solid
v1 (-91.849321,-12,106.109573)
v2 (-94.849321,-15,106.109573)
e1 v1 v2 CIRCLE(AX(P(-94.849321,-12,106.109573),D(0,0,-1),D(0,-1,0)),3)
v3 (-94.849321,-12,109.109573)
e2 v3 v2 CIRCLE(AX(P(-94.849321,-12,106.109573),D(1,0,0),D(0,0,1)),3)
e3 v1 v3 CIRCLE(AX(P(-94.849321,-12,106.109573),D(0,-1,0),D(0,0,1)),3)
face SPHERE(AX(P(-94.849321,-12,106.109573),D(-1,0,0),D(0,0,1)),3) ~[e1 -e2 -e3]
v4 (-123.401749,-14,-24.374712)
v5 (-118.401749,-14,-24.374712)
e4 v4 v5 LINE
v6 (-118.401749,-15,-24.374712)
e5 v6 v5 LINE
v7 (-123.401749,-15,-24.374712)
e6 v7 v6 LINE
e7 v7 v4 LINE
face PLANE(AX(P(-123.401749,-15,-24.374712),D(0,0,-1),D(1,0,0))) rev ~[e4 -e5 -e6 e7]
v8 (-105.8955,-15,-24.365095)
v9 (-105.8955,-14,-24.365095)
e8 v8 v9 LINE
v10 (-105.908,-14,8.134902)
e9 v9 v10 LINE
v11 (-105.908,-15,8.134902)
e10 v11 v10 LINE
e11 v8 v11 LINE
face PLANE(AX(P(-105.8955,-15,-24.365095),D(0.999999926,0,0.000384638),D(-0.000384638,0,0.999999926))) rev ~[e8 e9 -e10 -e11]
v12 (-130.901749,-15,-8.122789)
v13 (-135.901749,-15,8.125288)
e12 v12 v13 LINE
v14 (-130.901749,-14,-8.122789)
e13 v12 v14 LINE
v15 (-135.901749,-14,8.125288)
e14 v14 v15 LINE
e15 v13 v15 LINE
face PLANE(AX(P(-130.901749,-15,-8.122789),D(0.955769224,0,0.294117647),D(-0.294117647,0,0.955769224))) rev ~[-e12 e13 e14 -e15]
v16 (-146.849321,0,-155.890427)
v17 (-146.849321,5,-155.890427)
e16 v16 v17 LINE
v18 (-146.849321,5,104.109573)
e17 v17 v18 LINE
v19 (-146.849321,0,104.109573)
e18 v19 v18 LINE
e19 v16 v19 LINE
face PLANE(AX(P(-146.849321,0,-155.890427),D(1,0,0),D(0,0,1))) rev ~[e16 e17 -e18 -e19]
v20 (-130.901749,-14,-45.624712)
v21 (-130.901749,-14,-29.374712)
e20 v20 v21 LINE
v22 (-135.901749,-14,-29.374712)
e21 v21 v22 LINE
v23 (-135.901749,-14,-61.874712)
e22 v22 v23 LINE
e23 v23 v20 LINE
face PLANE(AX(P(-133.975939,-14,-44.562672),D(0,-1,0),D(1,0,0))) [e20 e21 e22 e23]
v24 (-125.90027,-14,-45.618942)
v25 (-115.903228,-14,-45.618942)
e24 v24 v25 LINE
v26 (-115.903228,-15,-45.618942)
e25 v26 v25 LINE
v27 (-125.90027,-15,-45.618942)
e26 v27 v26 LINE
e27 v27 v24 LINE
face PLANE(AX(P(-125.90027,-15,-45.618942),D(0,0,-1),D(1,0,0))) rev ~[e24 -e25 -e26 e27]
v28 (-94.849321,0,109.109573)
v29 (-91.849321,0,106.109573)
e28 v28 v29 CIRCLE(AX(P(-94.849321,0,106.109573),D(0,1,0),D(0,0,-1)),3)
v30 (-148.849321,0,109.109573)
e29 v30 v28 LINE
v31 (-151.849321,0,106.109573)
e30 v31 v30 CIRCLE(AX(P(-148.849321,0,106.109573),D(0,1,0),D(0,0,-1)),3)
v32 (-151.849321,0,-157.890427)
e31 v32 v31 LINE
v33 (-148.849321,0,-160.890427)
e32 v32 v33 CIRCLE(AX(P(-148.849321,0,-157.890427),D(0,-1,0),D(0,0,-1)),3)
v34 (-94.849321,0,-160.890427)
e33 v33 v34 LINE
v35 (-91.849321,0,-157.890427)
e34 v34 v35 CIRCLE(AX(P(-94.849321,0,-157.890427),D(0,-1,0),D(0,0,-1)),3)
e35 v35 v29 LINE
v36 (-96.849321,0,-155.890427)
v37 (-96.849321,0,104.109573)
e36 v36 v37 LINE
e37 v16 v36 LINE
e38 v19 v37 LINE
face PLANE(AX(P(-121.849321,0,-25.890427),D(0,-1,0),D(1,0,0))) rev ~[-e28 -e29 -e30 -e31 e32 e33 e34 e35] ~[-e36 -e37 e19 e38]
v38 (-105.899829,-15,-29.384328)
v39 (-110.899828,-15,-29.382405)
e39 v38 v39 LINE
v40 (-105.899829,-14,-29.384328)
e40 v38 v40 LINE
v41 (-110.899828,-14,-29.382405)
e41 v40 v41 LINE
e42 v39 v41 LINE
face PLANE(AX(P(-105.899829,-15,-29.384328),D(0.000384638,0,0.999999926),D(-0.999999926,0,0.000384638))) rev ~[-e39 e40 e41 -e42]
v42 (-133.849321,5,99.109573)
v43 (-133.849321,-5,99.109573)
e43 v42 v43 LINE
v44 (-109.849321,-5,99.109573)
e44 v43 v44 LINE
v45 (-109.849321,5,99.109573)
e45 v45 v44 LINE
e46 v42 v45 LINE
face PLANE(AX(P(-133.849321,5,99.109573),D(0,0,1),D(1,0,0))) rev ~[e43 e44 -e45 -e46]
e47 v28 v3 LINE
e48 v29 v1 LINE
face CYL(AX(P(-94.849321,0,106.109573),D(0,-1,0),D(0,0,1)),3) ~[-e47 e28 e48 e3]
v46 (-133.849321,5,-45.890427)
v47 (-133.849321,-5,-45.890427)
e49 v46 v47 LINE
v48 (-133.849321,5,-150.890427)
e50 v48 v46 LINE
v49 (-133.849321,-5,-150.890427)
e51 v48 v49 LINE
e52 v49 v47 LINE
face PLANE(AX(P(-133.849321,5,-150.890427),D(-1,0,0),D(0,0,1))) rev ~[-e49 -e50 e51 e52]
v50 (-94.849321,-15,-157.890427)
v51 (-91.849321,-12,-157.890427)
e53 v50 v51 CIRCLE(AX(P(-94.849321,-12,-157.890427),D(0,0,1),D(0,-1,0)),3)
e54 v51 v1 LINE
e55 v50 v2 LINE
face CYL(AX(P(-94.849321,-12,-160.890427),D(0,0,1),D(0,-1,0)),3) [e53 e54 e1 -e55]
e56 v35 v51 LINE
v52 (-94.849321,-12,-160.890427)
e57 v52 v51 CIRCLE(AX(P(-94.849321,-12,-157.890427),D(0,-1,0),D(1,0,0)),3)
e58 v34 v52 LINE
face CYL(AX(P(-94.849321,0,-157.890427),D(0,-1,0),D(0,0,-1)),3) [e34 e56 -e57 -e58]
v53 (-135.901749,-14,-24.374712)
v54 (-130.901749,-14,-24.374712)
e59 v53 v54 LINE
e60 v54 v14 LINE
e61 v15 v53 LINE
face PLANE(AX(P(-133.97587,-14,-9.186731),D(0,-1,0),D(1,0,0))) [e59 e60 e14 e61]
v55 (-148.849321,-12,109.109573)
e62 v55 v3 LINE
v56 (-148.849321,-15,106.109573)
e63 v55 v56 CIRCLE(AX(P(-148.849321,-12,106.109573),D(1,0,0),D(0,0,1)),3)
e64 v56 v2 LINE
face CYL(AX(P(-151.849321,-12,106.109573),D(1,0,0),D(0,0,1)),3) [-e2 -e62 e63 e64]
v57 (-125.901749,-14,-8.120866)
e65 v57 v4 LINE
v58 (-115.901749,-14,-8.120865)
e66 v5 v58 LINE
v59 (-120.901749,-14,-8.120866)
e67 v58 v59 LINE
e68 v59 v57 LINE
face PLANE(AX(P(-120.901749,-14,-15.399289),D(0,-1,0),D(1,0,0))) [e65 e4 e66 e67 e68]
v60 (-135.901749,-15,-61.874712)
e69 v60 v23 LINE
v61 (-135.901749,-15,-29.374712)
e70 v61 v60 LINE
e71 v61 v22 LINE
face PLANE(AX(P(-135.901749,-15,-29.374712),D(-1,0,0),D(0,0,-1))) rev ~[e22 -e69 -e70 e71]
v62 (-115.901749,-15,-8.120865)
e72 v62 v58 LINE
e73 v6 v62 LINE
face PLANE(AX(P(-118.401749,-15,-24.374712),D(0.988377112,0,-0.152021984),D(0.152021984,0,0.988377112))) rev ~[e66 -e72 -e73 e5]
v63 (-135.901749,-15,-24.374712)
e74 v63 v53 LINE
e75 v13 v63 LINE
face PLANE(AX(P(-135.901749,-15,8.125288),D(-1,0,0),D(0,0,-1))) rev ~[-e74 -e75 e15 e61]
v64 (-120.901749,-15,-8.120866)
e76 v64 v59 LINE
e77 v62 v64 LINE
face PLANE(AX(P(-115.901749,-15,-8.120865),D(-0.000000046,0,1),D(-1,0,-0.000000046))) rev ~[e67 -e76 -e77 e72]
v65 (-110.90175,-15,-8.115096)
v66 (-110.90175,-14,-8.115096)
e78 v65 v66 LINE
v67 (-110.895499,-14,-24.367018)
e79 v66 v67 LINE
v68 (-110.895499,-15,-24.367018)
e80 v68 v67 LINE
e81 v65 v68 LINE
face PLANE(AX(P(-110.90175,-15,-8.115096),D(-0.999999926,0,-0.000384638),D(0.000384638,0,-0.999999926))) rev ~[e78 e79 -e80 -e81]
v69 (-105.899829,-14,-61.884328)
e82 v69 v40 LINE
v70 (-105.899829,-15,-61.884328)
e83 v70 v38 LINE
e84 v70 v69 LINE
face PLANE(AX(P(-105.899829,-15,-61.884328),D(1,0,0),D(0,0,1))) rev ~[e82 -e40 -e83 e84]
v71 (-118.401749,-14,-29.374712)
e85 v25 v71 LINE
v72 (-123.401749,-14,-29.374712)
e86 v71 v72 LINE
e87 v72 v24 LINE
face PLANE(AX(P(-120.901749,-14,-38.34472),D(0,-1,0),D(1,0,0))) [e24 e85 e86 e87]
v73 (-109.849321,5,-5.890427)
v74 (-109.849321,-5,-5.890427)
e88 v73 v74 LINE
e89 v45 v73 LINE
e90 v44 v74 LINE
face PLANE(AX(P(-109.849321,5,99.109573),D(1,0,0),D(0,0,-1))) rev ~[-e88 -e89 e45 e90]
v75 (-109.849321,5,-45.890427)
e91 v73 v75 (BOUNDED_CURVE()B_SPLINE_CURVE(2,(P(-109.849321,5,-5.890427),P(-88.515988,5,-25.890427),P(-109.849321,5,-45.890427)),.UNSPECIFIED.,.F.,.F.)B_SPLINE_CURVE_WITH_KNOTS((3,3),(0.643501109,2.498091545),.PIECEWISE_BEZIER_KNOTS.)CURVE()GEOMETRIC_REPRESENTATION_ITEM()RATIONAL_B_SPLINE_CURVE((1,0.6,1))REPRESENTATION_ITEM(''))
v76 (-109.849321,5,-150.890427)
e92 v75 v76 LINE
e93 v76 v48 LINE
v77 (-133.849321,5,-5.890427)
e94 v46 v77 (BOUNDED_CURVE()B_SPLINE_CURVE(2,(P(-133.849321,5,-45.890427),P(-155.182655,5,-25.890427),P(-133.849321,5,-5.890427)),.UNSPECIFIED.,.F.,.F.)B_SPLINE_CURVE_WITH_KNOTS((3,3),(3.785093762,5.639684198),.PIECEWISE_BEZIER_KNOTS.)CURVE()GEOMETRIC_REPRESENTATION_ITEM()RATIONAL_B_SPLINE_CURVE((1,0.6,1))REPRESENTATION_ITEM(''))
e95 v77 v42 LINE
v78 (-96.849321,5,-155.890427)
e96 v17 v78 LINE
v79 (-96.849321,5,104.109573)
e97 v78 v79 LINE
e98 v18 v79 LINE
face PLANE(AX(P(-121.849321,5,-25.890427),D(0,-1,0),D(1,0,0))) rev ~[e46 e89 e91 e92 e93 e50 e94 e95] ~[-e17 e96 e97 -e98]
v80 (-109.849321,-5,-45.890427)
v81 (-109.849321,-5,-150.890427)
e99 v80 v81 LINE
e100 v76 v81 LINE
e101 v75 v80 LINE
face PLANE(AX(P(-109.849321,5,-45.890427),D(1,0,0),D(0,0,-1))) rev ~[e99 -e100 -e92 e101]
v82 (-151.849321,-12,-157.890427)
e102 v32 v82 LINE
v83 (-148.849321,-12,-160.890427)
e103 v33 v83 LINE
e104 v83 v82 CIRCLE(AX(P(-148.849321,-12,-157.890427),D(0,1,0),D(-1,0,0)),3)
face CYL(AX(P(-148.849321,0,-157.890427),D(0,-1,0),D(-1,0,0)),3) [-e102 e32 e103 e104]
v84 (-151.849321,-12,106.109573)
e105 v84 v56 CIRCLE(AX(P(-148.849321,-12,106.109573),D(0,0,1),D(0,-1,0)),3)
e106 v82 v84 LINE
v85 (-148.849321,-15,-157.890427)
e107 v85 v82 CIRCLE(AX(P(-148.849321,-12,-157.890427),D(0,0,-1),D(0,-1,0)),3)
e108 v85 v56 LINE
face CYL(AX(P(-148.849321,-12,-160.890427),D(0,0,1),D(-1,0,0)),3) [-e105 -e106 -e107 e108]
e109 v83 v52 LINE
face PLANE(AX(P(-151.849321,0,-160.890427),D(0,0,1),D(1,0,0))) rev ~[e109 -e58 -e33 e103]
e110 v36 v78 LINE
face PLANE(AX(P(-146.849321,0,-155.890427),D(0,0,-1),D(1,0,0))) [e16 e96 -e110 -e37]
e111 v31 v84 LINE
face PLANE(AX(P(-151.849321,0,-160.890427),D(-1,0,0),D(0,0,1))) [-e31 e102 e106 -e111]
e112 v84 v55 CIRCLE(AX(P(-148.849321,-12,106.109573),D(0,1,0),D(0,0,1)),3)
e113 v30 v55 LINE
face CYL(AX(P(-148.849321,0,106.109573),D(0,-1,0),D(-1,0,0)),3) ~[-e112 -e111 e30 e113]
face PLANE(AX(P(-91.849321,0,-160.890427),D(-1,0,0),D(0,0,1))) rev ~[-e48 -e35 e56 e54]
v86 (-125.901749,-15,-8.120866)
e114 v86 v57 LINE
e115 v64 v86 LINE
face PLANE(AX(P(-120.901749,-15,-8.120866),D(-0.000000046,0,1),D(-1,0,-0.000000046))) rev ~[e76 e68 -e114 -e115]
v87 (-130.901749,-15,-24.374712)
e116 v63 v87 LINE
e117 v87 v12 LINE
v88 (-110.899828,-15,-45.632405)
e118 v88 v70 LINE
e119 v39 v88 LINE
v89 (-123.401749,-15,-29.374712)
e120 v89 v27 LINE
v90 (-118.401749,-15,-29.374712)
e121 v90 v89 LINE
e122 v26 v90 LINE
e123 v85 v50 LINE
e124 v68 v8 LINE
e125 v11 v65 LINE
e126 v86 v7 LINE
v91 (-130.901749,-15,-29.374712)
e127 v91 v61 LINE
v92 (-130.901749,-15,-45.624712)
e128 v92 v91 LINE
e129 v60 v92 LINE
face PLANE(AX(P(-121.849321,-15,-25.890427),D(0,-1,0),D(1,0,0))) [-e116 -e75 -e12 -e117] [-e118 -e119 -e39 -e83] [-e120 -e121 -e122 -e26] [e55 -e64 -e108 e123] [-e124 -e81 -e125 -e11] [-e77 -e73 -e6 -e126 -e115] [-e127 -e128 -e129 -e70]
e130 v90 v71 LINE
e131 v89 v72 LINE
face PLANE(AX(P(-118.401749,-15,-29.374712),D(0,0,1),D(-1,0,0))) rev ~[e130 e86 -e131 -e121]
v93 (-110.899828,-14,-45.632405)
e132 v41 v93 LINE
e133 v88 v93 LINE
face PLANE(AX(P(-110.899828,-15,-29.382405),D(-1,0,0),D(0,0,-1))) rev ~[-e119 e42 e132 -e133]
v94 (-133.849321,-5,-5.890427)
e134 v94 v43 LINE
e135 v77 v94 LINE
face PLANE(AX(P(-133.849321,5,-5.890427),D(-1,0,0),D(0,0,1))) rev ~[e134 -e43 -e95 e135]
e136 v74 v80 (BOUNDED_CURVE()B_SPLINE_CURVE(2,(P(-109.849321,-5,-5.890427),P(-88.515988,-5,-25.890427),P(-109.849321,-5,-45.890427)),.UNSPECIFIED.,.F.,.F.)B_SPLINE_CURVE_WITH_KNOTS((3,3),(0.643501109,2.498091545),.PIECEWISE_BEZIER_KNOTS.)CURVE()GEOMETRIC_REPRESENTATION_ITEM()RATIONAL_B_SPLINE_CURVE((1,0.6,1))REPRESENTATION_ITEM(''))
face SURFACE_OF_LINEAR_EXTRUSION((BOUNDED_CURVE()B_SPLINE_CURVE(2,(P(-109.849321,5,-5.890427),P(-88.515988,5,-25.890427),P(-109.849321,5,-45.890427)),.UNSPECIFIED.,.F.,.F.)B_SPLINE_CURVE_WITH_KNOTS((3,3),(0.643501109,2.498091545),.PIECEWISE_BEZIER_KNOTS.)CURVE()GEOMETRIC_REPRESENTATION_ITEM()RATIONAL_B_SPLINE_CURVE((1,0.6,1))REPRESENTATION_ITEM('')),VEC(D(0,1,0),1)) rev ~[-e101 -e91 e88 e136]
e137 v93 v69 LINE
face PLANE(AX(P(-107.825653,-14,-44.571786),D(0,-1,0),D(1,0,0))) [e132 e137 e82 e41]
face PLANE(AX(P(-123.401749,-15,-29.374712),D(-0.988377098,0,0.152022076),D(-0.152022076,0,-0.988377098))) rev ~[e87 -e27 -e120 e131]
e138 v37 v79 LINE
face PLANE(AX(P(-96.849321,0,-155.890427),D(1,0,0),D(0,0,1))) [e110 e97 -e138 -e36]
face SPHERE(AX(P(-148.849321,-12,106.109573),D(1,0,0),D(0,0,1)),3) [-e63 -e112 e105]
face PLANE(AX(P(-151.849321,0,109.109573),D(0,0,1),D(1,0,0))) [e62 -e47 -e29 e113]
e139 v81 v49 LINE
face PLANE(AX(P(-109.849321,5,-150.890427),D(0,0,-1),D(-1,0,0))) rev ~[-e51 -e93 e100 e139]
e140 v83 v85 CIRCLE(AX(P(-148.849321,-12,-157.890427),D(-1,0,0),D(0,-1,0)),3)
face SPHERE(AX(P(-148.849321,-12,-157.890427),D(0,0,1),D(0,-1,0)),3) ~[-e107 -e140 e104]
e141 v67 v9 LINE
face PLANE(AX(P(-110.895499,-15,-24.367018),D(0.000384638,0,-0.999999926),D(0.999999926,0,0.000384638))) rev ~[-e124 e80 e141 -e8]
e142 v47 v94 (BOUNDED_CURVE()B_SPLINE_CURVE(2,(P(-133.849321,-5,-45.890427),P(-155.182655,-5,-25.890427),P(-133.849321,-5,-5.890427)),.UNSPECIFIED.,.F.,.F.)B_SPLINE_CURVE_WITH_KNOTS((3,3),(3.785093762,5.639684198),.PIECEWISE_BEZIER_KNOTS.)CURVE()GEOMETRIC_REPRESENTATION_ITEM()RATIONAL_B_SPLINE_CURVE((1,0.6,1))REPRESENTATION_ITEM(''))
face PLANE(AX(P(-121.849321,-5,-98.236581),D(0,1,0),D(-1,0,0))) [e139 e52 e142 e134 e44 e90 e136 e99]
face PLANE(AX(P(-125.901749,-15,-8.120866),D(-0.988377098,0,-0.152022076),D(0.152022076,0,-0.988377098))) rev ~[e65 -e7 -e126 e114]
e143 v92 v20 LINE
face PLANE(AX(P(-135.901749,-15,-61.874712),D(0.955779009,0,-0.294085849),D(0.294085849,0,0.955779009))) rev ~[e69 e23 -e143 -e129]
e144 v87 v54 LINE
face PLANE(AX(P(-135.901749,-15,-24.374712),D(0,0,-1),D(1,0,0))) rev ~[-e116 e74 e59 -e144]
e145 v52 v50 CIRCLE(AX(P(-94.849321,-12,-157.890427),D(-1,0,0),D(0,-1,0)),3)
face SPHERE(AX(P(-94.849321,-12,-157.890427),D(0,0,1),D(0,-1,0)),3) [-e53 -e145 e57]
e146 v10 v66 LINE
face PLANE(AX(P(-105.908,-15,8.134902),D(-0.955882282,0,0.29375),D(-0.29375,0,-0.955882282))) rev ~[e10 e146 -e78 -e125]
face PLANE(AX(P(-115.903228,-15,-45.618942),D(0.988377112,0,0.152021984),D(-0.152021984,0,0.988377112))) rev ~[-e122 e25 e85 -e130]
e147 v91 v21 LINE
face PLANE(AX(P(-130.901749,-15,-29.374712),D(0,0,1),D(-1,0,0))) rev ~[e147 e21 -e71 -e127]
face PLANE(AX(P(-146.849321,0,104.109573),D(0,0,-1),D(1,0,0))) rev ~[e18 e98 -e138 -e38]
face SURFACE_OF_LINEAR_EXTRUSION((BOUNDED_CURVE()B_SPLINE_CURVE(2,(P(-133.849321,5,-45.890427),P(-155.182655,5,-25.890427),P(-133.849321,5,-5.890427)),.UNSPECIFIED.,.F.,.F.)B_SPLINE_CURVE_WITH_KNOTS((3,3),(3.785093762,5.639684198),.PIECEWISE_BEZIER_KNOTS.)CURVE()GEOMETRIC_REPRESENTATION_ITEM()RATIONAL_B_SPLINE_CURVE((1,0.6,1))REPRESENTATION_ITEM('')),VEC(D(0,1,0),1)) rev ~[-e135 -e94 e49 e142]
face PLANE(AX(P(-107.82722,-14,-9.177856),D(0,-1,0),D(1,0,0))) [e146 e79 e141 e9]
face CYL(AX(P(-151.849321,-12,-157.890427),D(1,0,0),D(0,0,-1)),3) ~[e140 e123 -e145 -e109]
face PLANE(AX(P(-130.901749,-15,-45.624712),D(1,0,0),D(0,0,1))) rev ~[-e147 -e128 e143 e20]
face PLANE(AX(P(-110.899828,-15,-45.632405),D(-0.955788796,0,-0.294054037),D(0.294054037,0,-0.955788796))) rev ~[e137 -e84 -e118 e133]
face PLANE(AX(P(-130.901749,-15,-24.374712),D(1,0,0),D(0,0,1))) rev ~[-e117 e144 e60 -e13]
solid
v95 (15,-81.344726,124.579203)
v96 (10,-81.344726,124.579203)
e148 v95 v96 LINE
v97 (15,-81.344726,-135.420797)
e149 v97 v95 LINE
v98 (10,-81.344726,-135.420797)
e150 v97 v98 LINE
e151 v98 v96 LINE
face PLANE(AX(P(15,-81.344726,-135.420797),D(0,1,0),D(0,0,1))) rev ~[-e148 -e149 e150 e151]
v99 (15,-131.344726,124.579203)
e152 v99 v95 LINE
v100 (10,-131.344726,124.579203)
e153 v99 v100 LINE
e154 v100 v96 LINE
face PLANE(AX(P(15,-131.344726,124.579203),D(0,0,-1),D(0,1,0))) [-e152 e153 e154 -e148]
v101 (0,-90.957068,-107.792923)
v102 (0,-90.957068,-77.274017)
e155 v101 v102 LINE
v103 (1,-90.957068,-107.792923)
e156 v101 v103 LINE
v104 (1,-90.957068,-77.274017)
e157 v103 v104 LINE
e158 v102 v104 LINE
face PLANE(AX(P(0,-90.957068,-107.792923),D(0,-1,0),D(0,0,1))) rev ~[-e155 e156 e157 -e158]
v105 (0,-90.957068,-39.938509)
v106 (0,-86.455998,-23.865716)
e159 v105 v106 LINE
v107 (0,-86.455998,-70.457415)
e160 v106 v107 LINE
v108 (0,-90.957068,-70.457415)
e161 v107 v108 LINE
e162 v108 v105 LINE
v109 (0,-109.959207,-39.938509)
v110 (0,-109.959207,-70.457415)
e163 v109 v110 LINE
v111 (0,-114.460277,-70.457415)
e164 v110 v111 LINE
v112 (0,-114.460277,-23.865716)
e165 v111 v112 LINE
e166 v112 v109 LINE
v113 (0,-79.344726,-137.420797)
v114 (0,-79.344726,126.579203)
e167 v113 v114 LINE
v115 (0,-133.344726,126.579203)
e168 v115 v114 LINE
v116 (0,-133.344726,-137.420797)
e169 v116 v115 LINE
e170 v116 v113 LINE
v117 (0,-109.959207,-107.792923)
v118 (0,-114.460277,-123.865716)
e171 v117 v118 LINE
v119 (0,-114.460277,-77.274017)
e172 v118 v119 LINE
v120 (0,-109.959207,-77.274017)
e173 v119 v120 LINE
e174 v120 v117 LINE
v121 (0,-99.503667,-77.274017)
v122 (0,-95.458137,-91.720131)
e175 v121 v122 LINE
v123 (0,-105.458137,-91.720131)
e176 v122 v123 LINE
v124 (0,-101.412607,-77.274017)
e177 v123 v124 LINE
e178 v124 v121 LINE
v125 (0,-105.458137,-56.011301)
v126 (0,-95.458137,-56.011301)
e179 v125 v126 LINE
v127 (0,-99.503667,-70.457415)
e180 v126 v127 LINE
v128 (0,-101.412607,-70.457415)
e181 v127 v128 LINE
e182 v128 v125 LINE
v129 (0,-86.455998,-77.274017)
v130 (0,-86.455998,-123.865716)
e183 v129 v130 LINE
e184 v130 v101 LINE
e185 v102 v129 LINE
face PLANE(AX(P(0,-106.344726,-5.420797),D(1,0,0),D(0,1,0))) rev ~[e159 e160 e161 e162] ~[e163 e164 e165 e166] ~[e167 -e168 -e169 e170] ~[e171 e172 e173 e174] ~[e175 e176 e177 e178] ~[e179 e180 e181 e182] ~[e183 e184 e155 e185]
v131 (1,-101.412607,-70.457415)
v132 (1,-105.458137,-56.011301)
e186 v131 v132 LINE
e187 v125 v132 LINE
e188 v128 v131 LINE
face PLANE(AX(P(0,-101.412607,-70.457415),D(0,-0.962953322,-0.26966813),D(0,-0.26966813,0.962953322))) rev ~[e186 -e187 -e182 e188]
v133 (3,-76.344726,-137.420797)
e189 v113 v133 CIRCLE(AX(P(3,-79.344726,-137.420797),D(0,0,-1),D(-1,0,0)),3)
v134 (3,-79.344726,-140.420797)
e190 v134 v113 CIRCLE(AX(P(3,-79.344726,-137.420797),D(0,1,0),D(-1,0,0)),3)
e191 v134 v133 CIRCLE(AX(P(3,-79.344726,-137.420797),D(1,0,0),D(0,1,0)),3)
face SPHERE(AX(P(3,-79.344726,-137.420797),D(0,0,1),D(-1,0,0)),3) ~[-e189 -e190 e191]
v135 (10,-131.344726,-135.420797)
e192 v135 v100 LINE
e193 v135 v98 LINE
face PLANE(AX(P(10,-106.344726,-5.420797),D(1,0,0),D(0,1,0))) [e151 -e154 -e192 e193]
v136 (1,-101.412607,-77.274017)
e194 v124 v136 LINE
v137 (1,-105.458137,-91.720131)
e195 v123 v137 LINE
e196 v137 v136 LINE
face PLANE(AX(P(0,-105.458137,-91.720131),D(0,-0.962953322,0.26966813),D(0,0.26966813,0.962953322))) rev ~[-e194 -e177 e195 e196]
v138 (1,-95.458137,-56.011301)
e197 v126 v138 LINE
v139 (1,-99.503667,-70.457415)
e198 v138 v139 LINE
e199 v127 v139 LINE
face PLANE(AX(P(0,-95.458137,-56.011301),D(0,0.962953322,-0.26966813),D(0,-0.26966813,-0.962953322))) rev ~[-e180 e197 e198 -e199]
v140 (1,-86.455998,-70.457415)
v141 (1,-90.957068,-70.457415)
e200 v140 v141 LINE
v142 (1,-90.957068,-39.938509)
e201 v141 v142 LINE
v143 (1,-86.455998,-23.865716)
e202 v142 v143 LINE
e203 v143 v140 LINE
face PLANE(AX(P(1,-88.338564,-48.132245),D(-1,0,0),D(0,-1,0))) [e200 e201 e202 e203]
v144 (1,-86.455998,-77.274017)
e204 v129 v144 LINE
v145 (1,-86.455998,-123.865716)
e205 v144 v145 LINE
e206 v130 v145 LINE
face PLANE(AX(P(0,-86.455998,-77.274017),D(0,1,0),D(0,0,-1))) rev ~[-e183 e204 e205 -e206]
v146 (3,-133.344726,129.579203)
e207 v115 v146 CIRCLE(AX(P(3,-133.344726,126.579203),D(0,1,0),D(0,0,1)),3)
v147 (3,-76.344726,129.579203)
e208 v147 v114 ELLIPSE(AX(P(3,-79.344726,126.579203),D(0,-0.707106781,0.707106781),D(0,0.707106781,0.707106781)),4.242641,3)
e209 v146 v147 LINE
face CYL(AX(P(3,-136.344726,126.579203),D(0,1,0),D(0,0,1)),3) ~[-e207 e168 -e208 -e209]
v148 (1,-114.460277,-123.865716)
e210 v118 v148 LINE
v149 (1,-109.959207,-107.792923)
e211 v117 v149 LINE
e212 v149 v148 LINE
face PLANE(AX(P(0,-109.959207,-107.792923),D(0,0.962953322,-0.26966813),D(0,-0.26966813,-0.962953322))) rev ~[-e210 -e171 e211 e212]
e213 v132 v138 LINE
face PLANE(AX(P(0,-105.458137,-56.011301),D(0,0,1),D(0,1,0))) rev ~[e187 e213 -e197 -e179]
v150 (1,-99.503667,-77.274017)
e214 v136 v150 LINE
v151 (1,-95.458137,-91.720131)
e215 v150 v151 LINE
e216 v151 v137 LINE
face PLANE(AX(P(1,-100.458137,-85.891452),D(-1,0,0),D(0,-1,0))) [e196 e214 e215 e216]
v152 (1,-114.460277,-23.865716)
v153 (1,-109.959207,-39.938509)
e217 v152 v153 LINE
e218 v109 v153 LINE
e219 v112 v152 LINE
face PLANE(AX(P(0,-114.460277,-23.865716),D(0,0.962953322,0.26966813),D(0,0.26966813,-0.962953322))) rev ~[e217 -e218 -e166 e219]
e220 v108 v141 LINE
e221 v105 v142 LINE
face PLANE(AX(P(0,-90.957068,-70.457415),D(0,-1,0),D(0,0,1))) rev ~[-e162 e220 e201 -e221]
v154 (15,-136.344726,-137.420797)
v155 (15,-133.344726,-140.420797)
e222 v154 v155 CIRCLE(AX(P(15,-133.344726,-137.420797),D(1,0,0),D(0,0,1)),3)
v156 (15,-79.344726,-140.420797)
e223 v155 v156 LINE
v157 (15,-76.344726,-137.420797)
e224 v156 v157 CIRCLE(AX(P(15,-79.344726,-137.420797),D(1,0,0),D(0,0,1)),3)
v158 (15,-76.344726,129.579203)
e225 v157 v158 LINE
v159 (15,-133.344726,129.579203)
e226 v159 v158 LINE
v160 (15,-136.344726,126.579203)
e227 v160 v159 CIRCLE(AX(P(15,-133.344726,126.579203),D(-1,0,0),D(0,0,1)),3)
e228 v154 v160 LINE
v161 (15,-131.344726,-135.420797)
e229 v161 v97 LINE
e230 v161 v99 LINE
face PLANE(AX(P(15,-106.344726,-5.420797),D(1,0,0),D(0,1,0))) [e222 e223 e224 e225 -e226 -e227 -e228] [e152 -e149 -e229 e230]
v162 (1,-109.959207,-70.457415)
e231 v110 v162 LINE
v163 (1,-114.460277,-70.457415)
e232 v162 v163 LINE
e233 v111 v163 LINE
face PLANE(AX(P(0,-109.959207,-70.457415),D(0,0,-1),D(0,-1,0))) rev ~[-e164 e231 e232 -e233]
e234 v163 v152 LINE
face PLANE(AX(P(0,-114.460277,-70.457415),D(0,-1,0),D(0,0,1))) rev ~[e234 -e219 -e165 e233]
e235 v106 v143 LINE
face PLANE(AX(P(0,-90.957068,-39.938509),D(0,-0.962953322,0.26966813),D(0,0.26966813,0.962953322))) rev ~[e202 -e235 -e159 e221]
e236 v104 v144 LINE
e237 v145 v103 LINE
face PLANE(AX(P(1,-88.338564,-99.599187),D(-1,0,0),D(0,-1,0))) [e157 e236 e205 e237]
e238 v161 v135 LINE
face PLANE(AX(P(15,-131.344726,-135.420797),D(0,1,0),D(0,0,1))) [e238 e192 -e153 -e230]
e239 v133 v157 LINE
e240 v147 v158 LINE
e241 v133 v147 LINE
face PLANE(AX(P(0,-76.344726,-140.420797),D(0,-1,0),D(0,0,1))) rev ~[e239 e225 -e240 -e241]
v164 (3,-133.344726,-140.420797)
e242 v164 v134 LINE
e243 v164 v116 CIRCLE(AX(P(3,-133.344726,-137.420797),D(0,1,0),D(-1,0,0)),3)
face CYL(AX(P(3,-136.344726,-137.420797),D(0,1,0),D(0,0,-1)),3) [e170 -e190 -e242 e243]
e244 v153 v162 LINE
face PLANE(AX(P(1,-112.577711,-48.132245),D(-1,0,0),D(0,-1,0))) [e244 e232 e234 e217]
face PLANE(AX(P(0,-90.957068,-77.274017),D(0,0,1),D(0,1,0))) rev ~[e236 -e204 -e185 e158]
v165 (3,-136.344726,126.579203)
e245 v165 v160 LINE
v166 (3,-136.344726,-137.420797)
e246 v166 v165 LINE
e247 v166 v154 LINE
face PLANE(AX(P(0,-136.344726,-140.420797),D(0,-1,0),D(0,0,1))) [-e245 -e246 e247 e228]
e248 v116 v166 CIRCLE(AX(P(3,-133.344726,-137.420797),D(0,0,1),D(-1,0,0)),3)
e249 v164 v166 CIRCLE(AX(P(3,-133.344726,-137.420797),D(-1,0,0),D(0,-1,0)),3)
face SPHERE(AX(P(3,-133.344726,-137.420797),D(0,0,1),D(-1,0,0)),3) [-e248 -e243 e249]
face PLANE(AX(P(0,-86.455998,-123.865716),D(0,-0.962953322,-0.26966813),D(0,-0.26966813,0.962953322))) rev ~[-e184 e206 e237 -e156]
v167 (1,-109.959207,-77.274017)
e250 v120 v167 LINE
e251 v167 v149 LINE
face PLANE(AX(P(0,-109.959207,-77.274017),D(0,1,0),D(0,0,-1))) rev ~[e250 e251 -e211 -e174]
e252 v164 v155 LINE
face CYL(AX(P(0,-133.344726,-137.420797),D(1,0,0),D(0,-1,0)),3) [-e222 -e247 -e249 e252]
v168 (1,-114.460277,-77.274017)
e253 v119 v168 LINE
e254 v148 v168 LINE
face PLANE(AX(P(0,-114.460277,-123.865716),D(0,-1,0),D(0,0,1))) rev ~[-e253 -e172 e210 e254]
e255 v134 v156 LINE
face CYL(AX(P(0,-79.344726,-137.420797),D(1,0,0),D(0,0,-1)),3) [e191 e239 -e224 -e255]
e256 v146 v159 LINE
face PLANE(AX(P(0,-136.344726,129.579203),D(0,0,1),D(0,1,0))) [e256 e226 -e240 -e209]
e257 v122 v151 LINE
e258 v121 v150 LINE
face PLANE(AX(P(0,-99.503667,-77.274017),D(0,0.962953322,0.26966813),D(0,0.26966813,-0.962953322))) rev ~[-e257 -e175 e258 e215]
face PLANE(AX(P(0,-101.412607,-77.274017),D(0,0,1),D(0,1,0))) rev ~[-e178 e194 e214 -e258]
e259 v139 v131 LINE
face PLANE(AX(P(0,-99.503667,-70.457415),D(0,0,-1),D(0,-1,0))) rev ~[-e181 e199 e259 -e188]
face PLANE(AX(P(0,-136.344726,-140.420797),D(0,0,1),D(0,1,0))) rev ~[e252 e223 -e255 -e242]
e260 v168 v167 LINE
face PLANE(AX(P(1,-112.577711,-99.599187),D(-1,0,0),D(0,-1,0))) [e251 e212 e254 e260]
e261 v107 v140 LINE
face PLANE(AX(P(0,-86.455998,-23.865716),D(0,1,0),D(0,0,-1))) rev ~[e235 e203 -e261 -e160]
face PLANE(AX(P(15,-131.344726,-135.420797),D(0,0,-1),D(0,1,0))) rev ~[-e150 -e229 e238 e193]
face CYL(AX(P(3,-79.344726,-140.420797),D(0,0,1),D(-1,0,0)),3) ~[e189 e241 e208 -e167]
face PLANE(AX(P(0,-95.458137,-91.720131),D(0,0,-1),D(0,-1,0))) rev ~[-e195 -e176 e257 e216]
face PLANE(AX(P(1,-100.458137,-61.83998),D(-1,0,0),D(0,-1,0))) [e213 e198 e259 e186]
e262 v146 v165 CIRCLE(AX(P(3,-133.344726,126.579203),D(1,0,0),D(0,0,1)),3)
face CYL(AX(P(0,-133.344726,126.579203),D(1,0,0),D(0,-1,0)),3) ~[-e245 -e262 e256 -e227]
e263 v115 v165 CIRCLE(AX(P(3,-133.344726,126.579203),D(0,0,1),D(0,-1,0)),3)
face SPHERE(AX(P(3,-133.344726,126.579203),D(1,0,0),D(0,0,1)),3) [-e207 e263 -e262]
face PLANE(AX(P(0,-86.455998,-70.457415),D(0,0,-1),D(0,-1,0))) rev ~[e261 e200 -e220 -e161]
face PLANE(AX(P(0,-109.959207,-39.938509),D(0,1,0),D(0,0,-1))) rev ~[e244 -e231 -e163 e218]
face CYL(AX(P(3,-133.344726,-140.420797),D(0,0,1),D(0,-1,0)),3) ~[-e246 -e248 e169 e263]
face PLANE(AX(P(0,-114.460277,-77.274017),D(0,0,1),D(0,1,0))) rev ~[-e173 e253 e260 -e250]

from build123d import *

# Parameters (mm, degrees)
F0_W      = 60
F0_H      = 270
F2_DEPTH  = 15
F3_W      = 50
F3_H      = 260
F4_DEPTH  = 5
F1_W      = 60
F1_H      = 270
F5_DEPTH  = 15
F6_W      = 50
F6_H      = 260
F7_DEPTH  = 5
F9_DEPTH  = 10
F10_R     = 3
F11_R     = 3
F13_DEPTH = 1
F15_DEPTH = 1


# Not quite as in the source:
# - a feature names something its author has since deleted; it is built from what else it names


with BuildPart() as f2:
    # F0 (on Front) → F2 (new body)
    with BuildSketch(Plane.XZ):
        with Locations((-121.8493213905, -25.8904273567)):
            Rectangle(F0_W, F0_H)
    extrude(amount=F2_DEPTH)

    # F3 (on face) → F4 (join)
    with BuildSketch(Plane.XZ):
        with Locations((-121.8493213905, -25.8904273567)):
            Rectangle(F3_W, F3_H)
    extrude(amount=-F4_DEPTH)

    # F8 (on face) → F9 (cut)
    with BuildSketch(Plane(origin=(0, 5, 0), x_dir=(-1, 0, 0), z_dir=(0, 1, 0))):
        with BuildLine():
            Line((109.8493213905, -150.8904273567), (133.8493213905, -150.8904273567))
            Line((133.8493213905, -150.8904273567), (133.8493213905, -45.8904273567))
            add(Edge.make_bspline(
                [(109.8493213905, -45.8904273567), (121.8493213905, -57.1404273567), (133.8493213905, -45.8904273567)],
                knots=[2.4980915448, 2.4980915448, 2.4980915448, 3.7850937624, 3.7850937624, 3.7850937624], degree=2, weights=[1, 0.8, 1]))
            Line((109.8493213905, -45.8904273567), (109.8493213905, -150.8904273567))
        make_face()
        with BuildLine():
            add(Edge.make_bspline(
                [(133.8493213905, -5.8904273567), (128.5159880572, -0.8904273567), (121.8493213905, -0.8904273567)],
                knots=[5.6396841984, 5.6396841984, 5.6396841984, 6.2831853072, 6.2831853072, 6.2831853072], degree=2, weights=[1, 0.9486832981, 1]))
            Line((133.8493213905, -5.8904273567), (133.8493213905, 99.1095726433))
            Line((133.8493213905, 99.1095726433), (109.8493213905, 99.1095726433))
            Line((109.8493213905, 99.1095726433), (109.8493213905, -5.8904273567))
            add(Edge.make_bspline(
                [(121.8493213905, -0.8904273567), (115.1826547239, -0.8904273567), (109.8493213905, -5.8904273567)],
                knots=[0, 0, 0, 0.6435011088, 0.6435011088, 0.6435011088], degree=2, weights=[1, 0.9486832981, 1]))
        make_face()
        with BuildLine():
            Line((133.8493213905, -5.8904273567), (133.8493213905, -45.8904273567))
            add(Edge.make_bspline(
                [(133.8493213905, -45.8904273567), (155.1826547239, -25.8904273567), (133.8493213905, -5.8904273567)],
                knots=[3.7850937624, 3.7850937624, 3.7850937624, 5.6396841984, 5.6396841984, 5.6396841984], degree=2, weights=[1, 0.6, 1]))
        make_face()
        with BuildLine():
            add(Edge.make_bspline(
                [(109.8493213905, -45.8904273567), (121.8493213905, -57.1404273567), (133.8493213905, -45.8904273567)],
                knots=[2.4980915448, 2.4980915448, 2.4980915448, 3.7850937624, 3.7850937624, 3.7850937624], degree=2, weights=[1, 0.8, 1]))
            Line((133.8493213905, -45.8904273567), (133.8493213905, -5.8904273567))
            add(Edge.make_bspline(
                [(133.8493213905, -5.8904273567), (128.5159880572, -0.8904273567), (121.8493213905, -0.8904273567)],
                knots=[5.6396841984, 5.6396841984, 5.6396841984, 6.2831853072, 6.2831853072, 6.2831853072], degree=2, weights=[1, 0.9486832981, 1]))
            add(Edge.make_bspline(
                [(121.8493213905, -0.8904273567), (115.1826547239, -0.8904273567), (109.8493213905, -5.8904273567)],
                knots=[0, 0, 0, 0.6435011088, 0.6435011088, 0.6435011088], degree=2, weights=[1, 0.9486832981, 1]))
            Line((109.8493213905, -5.8904273567), (109.8493213905, -45.8904273567))
        make_face()
        with BuildLine():
            add(Edge.make_bspline(
                [(109.8493213905, -5.8904273567), (88.5159880572, -25.8904273567), (109.8493213905, -45.8904273567)],
                knots=[0.6435011088, 0.6435011088, 0.6435011088, 2.4980915448, 2.4980915448, 2.4980915448], degree=2, weights=[1, 0.6, 1]))
            Line((109.8493213905, -45.8904273567), (109.8493213905, -5.8904273567))
        make_face()
    extrude(amount=-F9_DEPTH, mode=Mode.SUBTRACT)

    # F10
    f10_edges = [f2.edges().sort_by_distance(p)[0] for p in [
        (-121.849321, -15, 109.109573),
        (-151.849321, -7.5, 109.109573),
        (-91.849321, -7.5, 109.109573),
        (-91.849321, -15, -25.890427),
        (-151.849321, -15, -25.890427),
        (-121.849321, -15, -160.890427),
        (-151.849321, -7.5, -160.890427),
        (-91.849321, -7.5, -160.890427),
    ]]
    fillet(f10_edges, radius=F10_R)

    # F14 (on face) → F15 (cut)
    with BuildSketch(Plane.XZ.offset(15)):
        Polygon((-135.9017485874, 8.1252877414), (-135.9017485874, -24.3747122586), (-130.9017485874, -24.3747122586), (-130.9017485874, -8.1227890678), align=None)
        Polygon((-120.9017493272, -8.1208656498), (-125.9017493272, -8.1208658774), (-123.4017485874, -24.3747122586), (-118.4017485874, -24.3747122586), (-115.9017493272, -8.1208654223), align=None)
        Polygon((-105.9080004363, 8.1349024923), (-110.9017504368, -8.1150963056), (-110.8954993276, -24.3670182942), (-105.8954996975, -24.3650951036), align=None)
        Polygon((-130.9017485874, -29.3747122586), (-135.9017485874, -29.3747122586), (-135.9017485874, -45.6247122586), (-135.9017485874, -61.8747122586), (-130.9017485874, -45.6247122586), align=None)
        Polygon((-105.8998287257, -29.3843281183), (-110.8998283559, -29.3824049277), (-110.8998283559, -45.6324049277), (-105.8998287257, -61.8843281183), align=None)
        Polygon((-123.4017485874, -29.3747122586), (-125.9002702644, -45.6189424591), (-115.903228459, -45.6189424591), (-118.4017485874, -29.3747122586), align=None)
    extrude(amount=-F15_DEPTH, mode=Mode.SUBTRACT)


with BuildPart() as f5:
    # F1 (on Right) → F5 (new body)
    with BuildSketch(Plane.YZ):
        with Locations((-106.3447256267, -5.4207965732)):
            Rectangle(F1_W, F1_H)
    extrude(amount=F5_DEPTH)

    # F6 (on face) → F7 (cut)
    with BuildSketch(Plane.YZ.offset(15)):
        with Locations((-106.3447256267, -5.4207965732)):
            Rectangle(F6_W, F6_H)
    extrude(amount=-F7_DEPTH, mode=Mode.SUBTRACT)

    # F11
    f11_edges = [f5.edges().sort_by_distance(p)[0] for p in [
        (7.5, -136.344726, 129.579203),
        (0, -106.344726, 129.579203),
        (0, -136.344726, -5.420797),
        (0, -76.344726, -5.420797),
        (0, -106.344726, -140.420797),
        (7.5, -76.344726, -140.420797),
        (7.5, -136.344726, -140.420797),
    ]]
    fillet(f11_edges, radius=F11_R)

    # F12 (on face) → F13 (cut)
    with BuildSketch(Plane(origin=(0, 0, 0), x_dir=(0, -1, 0), z_dir=(-1, 0, 0))):
        Polygon((105.4581373974, -56.0113014256), (95.4581373974, -56.0113014256), (99.5036673885, -70.4574153882), (101.4126074063, -70.4574153882), align=None)
        Polygon((90.9570677645, -70.4574153882), (90.9570677645, -39.9385087348), (86.4559981315, -23.8657160441), (86.4559981315, -70.4574153882), align=None)
        Polygon((114.4602766633, -23.8657160441), (109.9592070304, -39.9385087348), (109.9592070304, -70.4574153882), (114.4602766633, -70.4574153882), align=None)
        Polygon((109.9592070304, -77.2740167), (109.9592070304, -107.7929233534), (114.4602766633, -123.8657160441), (114.4602766633, -77.2740167), align=None)
        Polygon((99.5036673885, -77.2740167), (95.4581373974, -91.7201306627), (105.4581373974, -91.7201306627), (101.4126074063, -77.2740167), align=None)
        Polygon((86.4559981315, -123.8657160441), (90.9570677645, -107.7929233534), (90.9570677645, -77.2740167), (86.4559981315, -77.2740167), align=None)
    extrude(amount=-F13_DEPTH, mode=Mode.SUBTRACT)


solid = Compound([f2.part, f5.part])
